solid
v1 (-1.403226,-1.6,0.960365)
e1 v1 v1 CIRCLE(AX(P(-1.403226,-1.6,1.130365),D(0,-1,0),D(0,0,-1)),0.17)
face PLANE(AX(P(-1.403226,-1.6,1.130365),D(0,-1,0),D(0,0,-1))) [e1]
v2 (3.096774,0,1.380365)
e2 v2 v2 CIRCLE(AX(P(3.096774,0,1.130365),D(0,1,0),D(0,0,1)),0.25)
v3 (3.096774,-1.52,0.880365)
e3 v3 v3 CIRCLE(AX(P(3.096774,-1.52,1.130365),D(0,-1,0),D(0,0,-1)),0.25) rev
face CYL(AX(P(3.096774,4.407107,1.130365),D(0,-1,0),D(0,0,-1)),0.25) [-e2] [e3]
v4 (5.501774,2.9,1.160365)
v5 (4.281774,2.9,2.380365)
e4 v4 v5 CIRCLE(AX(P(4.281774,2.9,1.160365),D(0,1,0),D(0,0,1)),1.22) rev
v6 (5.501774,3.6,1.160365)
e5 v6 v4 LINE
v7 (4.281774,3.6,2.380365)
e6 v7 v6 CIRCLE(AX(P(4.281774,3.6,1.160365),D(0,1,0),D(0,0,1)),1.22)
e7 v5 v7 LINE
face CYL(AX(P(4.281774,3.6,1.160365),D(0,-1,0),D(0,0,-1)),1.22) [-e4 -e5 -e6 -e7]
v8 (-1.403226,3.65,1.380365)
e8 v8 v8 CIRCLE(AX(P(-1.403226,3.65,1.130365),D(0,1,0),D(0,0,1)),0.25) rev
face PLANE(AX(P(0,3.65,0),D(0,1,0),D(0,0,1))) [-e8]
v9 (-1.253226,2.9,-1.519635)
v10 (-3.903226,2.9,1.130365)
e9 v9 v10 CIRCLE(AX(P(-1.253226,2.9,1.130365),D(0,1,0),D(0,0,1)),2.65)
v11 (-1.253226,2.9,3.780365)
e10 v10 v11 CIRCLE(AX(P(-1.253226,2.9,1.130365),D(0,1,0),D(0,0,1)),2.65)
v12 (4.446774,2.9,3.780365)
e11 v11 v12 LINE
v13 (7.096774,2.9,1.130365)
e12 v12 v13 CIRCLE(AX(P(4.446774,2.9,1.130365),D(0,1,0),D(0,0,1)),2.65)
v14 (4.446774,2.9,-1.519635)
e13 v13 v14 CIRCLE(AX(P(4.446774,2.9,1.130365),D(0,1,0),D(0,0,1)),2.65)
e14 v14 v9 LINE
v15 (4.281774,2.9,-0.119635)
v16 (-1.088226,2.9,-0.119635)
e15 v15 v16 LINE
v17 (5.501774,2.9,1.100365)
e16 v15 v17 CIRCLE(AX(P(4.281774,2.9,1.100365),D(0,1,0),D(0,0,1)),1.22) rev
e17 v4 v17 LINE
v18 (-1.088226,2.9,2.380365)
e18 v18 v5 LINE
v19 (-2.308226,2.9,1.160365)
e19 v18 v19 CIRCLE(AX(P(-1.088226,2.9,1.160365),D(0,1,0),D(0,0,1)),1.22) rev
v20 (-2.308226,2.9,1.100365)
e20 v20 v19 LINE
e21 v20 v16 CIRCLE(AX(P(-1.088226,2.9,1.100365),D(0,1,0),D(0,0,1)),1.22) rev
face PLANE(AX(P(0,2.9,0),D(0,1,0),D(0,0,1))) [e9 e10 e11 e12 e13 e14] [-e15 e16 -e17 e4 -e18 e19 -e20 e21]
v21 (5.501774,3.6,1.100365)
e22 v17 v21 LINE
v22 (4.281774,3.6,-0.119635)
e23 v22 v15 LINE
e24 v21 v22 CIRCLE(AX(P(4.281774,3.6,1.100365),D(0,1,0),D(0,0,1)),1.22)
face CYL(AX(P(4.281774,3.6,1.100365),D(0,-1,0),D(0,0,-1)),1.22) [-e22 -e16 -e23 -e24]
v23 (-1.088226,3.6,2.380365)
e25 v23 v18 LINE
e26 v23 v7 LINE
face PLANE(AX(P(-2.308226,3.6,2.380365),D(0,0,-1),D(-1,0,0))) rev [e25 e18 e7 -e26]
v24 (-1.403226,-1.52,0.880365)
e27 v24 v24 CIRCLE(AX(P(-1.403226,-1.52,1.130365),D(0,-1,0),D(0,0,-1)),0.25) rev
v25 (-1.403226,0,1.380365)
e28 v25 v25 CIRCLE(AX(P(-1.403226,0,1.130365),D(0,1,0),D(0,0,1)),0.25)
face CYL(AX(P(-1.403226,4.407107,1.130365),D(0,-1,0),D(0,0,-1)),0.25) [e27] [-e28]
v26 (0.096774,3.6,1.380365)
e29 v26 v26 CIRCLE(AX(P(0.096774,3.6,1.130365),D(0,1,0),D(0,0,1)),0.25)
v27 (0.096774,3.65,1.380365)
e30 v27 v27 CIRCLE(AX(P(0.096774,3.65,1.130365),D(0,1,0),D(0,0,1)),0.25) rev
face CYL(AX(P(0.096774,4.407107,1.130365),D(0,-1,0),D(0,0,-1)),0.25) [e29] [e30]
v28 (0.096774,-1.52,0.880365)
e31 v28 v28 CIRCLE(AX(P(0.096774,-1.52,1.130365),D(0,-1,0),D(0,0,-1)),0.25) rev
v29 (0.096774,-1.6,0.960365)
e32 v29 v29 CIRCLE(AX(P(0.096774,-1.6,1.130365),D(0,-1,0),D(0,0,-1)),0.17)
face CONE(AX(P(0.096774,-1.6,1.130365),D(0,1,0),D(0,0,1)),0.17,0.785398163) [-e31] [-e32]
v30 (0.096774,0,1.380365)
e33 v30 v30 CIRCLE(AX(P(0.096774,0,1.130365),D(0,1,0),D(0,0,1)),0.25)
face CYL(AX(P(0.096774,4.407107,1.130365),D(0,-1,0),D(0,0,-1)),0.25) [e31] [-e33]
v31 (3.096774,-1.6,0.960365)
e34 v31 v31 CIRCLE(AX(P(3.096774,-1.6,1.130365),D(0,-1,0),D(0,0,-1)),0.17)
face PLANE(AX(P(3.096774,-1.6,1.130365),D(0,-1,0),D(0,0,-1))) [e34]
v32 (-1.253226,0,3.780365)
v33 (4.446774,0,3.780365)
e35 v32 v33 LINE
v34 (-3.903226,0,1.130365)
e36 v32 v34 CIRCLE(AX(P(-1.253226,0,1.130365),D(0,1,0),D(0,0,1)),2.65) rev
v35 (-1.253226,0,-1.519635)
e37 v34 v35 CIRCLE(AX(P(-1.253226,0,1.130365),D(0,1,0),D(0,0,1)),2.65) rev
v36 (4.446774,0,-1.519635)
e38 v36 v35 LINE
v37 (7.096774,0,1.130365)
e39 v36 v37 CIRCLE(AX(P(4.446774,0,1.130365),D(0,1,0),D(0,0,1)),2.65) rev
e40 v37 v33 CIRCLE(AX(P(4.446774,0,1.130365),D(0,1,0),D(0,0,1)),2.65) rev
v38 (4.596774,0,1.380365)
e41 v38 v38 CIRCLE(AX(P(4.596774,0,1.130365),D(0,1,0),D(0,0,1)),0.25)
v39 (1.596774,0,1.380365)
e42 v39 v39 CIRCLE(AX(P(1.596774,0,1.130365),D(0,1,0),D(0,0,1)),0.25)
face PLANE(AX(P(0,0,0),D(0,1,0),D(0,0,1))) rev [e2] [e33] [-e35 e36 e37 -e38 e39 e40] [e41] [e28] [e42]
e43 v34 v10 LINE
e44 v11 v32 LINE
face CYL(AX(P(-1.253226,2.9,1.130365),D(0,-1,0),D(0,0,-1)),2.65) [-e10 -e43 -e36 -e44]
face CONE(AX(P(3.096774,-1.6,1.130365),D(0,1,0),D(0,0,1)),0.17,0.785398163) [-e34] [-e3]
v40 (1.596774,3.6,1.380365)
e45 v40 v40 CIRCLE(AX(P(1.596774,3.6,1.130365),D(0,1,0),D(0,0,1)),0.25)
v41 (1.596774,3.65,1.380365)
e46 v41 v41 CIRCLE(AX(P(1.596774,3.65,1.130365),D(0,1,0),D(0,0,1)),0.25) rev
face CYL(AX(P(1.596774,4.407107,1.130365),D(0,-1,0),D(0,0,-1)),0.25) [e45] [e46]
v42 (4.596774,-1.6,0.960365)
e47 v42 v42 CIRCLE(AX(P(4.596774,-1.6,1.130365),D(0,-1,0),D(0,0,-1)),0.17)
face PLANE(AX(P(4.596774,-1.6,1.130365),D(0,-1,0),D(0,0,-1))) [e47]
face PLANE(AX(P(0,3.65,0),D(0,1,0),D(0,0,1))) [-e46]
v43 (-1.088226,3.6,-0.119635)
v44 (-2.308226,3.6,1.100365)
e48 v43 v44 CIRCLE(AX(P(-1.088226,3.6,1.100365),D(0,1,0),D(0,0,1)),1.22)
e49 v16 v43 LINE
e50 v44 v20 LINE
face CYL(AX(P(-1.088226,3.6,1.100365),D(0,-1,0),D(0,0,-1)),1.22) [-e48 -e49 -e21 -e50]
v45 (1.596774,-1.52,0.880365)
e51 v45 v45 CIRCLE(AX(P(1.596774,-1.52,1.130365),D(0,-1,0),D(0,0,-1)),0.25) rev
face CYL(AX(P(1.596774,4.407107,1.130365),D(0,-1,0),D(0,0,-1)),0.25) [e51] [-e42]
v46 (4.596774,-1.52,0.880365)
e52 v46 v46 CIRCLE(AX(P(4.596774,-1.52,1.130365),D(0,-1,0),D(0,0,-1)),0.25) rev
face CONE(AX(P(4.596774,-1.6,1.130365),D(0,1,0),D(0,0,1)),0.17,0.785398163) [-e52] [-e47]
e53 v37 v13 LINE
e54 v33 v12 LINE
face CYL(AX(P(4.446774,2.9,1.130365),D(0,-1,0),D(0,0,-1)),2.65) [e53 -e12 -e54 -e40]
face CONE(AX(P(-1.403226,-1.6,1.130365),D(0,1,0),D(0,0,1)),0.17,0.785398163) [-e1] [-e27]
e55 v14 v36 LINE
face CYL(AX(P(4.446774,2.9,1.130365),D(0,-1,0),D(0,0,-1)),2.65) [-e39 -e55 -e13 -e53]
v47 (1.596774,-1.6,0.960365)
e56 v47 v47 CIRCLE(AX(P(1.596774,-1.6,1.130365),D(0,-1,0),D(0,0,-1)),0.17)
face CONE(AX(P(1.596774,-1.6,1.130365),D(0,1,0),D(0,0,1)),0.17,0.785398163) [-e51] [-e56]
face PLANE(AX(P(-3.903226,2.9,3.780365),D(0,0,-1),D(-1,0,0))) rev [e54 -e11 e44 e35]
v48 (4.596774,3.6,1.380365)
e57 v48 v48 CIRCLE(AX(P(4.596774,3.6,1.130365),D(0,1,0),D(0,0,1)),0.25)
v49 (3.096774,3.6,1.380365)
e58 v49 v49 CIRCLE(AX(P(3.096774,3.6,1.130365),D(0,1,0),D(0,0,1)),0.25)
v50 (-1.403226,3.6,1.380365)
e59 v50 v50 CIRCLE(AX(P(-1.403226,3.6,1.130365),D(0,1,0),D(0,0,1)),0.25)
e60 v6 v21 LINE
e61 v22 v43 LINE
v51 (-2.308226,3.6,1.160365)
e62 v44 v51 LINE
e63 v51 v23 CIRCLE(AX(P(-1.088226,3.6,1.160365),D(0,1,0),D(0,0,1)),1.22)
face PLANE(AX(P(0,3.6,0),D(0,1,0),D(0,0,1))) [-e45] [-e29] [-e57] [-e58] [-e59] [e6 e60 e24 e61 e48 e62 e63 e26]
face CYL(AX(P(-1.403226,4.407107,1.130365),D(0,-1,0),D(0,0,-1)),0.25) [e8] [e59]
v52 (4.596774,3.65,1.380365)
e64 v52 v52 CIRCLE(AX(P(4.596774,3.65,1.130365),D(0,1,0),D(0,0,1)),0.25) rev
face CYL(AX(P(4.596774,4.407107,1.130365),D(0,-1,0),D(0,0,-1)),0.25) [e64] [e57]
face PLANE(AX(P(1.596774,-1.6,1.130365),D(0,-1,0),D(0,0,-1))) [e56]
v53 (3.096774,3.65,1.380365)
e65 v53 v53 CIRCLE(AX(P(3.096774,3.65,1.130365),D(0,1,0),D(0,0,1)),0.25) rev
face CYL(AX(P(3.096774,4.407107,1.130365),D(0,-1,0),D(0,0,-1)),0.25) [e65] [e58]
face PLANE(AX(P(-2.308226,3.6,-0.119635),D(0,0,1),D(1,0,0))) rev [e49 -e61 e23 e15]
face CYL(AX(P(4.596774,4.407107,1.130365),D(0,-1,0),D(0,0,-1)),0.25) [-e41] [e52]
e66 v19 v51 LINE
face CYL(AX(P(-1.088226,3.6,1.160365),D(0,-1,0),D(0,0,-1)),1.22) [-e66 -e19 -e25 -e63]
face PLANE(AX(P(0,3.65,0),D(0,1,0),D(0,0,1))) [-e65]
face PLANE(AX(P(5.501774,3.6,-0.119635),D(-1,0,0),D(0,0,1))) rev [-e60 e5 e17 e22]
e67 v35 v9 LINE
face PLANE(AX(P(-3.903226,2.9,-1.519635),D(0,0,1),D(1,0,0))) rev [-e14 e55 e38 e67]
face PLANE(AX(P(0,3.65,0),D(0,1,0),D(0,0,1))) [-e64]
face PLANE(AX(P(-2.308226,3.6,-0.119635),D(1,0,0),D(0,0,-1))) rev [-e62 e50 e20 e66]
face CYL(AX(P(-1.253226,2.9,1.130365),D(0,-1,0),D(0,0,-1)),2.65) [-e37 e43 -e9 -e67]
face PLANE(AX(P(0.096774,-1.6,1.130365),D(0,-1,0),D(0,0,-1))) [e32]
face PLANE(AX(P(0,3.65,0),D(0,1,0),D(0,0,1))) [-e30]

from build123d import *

# Parameters (mm, degrees)
SKETCH1_W                = 11
SKETCH1_H                = 5.3
BOSS_EXTRUDE1_DEPTH      = 2.9
SKETCH2_W                = 7.81
SKETCH2_H                = 2.5
BOSS_EXTRUDE2_DEPTH      = 0.7
BOSS_EXTRUDE3_DEPTH      = 1.6
BOSS_EXTRUDE3_DEPTH_BACK = 3.65
SKETCH3_R                = 0.25
CHAMFER1_SIZE            = 0.08
FILLET1_R                = 2.65
FILLET2_R                = 1.22


with BuildPart() as part:
    # Sketch1 → Boss-Extrude1 (new body)
    with BuildSketch(Plane(origin=(0, 0, 0), x_dir=(1, 0, 0), z_dir=(0, 1, 0))):
        with Locations((1.596774194, -1.130364656)):
            Rectangle(SKETCH1_W, SKETCH1_H)
    extrude(amount=BOSS_EXTRUDE1_DEPTH)

    # Sketch2 → Boss-Extrude2 (add)
    with BuildSketch(Plane(origin=(0, 2.9, 0), x_dir=(1, 0, 0), z_dir=(0, 1, 0))):
        with Locations((1.596774194, -1.130364656)):
            Rectangle(SKETCH2_W, SKETCH2_H)
    extrude(amount=BOSS_EXTRUDE2_DEPTH)

    # Sketch3 → Boss-Extrude3 (add, two sides: drawn at the far end of the back side and taken through both)
    with BuildSketch(Plane.XZ.offset(-BOSS_EXTRUDE3_DEPTH_BACK)):
        with Locations(Location((1.596774194, 1.130364656, 0), (0, 0, 90))):
            Circle(SKETCH3_R)
        with Locations(Location((3.096774194, 1.130364656, 0), (0, 0, 90))):
            Circle(SKETCH3_R)
        with Locations(Location((4.596774194, 1.130364656, 0), (0, 0, 90))):
            Circle(SKETCH3_R)
        with Locations(Location((0.096774194, 1.130364656, 0), (0, 0, 90))):
            Circle(SKETCH3_R)
        with Locations(Location((-1.403225806, 1.130364656, 0), (0, 0, 90))):
            Circle(SKETCH3_R)
    extrude(amount=BOSS_EXTRUDE3_DEPTH + BOSS_EXTRUDE3_DEPTH_BACK)

    # Chamfer1
    chamfer1_edges = [part.edges().sort_by_distance(p)[0] for p in [
        (1.596774194, -1.6, 0.880364656),
        (3.096774194, -1.6, 0.880364656),
        (4.596774194, -1.6, 0.880364656),
        (0.096774194, -1.6, 0.880364656),
        (-1.403225806, -1.6, 0.880364656),
    ]]
    chamfer(chamfer1_edges, length=CHAMFER1_SIZE)

    # Fillet1
    fillet1_edges = [part.edges().sort_by_distance(p)[0] for p in [
        (-3.903225806, 1.45, -1.519635344),
        (-3.903225806, 1.45, 3.780364656),
        (7.096774194, 1.45, 3.780364656),
        (7.096774194, 1.45, -1.519635344),
    ]]
    fillet(fillet1_edges, radius=FILLET1_R - 0.0001)  # a hair under: the kernel refuses the full size

    # Fillet2
    fillet2_edges = [part.edges().sort_by_distance(p)[0] for p in [
        (-2.308225806, 3.25, -0.119635344),
        (-2.308225806, 3.25, 2.380364656),
        (5.501774194, 3.25, 2.380364656),
        (5.501774194, 3.25, -0.119635344),
    ]]
    fillet(fillet2_edges, radius=FILLET2_R)


solid = part.part
